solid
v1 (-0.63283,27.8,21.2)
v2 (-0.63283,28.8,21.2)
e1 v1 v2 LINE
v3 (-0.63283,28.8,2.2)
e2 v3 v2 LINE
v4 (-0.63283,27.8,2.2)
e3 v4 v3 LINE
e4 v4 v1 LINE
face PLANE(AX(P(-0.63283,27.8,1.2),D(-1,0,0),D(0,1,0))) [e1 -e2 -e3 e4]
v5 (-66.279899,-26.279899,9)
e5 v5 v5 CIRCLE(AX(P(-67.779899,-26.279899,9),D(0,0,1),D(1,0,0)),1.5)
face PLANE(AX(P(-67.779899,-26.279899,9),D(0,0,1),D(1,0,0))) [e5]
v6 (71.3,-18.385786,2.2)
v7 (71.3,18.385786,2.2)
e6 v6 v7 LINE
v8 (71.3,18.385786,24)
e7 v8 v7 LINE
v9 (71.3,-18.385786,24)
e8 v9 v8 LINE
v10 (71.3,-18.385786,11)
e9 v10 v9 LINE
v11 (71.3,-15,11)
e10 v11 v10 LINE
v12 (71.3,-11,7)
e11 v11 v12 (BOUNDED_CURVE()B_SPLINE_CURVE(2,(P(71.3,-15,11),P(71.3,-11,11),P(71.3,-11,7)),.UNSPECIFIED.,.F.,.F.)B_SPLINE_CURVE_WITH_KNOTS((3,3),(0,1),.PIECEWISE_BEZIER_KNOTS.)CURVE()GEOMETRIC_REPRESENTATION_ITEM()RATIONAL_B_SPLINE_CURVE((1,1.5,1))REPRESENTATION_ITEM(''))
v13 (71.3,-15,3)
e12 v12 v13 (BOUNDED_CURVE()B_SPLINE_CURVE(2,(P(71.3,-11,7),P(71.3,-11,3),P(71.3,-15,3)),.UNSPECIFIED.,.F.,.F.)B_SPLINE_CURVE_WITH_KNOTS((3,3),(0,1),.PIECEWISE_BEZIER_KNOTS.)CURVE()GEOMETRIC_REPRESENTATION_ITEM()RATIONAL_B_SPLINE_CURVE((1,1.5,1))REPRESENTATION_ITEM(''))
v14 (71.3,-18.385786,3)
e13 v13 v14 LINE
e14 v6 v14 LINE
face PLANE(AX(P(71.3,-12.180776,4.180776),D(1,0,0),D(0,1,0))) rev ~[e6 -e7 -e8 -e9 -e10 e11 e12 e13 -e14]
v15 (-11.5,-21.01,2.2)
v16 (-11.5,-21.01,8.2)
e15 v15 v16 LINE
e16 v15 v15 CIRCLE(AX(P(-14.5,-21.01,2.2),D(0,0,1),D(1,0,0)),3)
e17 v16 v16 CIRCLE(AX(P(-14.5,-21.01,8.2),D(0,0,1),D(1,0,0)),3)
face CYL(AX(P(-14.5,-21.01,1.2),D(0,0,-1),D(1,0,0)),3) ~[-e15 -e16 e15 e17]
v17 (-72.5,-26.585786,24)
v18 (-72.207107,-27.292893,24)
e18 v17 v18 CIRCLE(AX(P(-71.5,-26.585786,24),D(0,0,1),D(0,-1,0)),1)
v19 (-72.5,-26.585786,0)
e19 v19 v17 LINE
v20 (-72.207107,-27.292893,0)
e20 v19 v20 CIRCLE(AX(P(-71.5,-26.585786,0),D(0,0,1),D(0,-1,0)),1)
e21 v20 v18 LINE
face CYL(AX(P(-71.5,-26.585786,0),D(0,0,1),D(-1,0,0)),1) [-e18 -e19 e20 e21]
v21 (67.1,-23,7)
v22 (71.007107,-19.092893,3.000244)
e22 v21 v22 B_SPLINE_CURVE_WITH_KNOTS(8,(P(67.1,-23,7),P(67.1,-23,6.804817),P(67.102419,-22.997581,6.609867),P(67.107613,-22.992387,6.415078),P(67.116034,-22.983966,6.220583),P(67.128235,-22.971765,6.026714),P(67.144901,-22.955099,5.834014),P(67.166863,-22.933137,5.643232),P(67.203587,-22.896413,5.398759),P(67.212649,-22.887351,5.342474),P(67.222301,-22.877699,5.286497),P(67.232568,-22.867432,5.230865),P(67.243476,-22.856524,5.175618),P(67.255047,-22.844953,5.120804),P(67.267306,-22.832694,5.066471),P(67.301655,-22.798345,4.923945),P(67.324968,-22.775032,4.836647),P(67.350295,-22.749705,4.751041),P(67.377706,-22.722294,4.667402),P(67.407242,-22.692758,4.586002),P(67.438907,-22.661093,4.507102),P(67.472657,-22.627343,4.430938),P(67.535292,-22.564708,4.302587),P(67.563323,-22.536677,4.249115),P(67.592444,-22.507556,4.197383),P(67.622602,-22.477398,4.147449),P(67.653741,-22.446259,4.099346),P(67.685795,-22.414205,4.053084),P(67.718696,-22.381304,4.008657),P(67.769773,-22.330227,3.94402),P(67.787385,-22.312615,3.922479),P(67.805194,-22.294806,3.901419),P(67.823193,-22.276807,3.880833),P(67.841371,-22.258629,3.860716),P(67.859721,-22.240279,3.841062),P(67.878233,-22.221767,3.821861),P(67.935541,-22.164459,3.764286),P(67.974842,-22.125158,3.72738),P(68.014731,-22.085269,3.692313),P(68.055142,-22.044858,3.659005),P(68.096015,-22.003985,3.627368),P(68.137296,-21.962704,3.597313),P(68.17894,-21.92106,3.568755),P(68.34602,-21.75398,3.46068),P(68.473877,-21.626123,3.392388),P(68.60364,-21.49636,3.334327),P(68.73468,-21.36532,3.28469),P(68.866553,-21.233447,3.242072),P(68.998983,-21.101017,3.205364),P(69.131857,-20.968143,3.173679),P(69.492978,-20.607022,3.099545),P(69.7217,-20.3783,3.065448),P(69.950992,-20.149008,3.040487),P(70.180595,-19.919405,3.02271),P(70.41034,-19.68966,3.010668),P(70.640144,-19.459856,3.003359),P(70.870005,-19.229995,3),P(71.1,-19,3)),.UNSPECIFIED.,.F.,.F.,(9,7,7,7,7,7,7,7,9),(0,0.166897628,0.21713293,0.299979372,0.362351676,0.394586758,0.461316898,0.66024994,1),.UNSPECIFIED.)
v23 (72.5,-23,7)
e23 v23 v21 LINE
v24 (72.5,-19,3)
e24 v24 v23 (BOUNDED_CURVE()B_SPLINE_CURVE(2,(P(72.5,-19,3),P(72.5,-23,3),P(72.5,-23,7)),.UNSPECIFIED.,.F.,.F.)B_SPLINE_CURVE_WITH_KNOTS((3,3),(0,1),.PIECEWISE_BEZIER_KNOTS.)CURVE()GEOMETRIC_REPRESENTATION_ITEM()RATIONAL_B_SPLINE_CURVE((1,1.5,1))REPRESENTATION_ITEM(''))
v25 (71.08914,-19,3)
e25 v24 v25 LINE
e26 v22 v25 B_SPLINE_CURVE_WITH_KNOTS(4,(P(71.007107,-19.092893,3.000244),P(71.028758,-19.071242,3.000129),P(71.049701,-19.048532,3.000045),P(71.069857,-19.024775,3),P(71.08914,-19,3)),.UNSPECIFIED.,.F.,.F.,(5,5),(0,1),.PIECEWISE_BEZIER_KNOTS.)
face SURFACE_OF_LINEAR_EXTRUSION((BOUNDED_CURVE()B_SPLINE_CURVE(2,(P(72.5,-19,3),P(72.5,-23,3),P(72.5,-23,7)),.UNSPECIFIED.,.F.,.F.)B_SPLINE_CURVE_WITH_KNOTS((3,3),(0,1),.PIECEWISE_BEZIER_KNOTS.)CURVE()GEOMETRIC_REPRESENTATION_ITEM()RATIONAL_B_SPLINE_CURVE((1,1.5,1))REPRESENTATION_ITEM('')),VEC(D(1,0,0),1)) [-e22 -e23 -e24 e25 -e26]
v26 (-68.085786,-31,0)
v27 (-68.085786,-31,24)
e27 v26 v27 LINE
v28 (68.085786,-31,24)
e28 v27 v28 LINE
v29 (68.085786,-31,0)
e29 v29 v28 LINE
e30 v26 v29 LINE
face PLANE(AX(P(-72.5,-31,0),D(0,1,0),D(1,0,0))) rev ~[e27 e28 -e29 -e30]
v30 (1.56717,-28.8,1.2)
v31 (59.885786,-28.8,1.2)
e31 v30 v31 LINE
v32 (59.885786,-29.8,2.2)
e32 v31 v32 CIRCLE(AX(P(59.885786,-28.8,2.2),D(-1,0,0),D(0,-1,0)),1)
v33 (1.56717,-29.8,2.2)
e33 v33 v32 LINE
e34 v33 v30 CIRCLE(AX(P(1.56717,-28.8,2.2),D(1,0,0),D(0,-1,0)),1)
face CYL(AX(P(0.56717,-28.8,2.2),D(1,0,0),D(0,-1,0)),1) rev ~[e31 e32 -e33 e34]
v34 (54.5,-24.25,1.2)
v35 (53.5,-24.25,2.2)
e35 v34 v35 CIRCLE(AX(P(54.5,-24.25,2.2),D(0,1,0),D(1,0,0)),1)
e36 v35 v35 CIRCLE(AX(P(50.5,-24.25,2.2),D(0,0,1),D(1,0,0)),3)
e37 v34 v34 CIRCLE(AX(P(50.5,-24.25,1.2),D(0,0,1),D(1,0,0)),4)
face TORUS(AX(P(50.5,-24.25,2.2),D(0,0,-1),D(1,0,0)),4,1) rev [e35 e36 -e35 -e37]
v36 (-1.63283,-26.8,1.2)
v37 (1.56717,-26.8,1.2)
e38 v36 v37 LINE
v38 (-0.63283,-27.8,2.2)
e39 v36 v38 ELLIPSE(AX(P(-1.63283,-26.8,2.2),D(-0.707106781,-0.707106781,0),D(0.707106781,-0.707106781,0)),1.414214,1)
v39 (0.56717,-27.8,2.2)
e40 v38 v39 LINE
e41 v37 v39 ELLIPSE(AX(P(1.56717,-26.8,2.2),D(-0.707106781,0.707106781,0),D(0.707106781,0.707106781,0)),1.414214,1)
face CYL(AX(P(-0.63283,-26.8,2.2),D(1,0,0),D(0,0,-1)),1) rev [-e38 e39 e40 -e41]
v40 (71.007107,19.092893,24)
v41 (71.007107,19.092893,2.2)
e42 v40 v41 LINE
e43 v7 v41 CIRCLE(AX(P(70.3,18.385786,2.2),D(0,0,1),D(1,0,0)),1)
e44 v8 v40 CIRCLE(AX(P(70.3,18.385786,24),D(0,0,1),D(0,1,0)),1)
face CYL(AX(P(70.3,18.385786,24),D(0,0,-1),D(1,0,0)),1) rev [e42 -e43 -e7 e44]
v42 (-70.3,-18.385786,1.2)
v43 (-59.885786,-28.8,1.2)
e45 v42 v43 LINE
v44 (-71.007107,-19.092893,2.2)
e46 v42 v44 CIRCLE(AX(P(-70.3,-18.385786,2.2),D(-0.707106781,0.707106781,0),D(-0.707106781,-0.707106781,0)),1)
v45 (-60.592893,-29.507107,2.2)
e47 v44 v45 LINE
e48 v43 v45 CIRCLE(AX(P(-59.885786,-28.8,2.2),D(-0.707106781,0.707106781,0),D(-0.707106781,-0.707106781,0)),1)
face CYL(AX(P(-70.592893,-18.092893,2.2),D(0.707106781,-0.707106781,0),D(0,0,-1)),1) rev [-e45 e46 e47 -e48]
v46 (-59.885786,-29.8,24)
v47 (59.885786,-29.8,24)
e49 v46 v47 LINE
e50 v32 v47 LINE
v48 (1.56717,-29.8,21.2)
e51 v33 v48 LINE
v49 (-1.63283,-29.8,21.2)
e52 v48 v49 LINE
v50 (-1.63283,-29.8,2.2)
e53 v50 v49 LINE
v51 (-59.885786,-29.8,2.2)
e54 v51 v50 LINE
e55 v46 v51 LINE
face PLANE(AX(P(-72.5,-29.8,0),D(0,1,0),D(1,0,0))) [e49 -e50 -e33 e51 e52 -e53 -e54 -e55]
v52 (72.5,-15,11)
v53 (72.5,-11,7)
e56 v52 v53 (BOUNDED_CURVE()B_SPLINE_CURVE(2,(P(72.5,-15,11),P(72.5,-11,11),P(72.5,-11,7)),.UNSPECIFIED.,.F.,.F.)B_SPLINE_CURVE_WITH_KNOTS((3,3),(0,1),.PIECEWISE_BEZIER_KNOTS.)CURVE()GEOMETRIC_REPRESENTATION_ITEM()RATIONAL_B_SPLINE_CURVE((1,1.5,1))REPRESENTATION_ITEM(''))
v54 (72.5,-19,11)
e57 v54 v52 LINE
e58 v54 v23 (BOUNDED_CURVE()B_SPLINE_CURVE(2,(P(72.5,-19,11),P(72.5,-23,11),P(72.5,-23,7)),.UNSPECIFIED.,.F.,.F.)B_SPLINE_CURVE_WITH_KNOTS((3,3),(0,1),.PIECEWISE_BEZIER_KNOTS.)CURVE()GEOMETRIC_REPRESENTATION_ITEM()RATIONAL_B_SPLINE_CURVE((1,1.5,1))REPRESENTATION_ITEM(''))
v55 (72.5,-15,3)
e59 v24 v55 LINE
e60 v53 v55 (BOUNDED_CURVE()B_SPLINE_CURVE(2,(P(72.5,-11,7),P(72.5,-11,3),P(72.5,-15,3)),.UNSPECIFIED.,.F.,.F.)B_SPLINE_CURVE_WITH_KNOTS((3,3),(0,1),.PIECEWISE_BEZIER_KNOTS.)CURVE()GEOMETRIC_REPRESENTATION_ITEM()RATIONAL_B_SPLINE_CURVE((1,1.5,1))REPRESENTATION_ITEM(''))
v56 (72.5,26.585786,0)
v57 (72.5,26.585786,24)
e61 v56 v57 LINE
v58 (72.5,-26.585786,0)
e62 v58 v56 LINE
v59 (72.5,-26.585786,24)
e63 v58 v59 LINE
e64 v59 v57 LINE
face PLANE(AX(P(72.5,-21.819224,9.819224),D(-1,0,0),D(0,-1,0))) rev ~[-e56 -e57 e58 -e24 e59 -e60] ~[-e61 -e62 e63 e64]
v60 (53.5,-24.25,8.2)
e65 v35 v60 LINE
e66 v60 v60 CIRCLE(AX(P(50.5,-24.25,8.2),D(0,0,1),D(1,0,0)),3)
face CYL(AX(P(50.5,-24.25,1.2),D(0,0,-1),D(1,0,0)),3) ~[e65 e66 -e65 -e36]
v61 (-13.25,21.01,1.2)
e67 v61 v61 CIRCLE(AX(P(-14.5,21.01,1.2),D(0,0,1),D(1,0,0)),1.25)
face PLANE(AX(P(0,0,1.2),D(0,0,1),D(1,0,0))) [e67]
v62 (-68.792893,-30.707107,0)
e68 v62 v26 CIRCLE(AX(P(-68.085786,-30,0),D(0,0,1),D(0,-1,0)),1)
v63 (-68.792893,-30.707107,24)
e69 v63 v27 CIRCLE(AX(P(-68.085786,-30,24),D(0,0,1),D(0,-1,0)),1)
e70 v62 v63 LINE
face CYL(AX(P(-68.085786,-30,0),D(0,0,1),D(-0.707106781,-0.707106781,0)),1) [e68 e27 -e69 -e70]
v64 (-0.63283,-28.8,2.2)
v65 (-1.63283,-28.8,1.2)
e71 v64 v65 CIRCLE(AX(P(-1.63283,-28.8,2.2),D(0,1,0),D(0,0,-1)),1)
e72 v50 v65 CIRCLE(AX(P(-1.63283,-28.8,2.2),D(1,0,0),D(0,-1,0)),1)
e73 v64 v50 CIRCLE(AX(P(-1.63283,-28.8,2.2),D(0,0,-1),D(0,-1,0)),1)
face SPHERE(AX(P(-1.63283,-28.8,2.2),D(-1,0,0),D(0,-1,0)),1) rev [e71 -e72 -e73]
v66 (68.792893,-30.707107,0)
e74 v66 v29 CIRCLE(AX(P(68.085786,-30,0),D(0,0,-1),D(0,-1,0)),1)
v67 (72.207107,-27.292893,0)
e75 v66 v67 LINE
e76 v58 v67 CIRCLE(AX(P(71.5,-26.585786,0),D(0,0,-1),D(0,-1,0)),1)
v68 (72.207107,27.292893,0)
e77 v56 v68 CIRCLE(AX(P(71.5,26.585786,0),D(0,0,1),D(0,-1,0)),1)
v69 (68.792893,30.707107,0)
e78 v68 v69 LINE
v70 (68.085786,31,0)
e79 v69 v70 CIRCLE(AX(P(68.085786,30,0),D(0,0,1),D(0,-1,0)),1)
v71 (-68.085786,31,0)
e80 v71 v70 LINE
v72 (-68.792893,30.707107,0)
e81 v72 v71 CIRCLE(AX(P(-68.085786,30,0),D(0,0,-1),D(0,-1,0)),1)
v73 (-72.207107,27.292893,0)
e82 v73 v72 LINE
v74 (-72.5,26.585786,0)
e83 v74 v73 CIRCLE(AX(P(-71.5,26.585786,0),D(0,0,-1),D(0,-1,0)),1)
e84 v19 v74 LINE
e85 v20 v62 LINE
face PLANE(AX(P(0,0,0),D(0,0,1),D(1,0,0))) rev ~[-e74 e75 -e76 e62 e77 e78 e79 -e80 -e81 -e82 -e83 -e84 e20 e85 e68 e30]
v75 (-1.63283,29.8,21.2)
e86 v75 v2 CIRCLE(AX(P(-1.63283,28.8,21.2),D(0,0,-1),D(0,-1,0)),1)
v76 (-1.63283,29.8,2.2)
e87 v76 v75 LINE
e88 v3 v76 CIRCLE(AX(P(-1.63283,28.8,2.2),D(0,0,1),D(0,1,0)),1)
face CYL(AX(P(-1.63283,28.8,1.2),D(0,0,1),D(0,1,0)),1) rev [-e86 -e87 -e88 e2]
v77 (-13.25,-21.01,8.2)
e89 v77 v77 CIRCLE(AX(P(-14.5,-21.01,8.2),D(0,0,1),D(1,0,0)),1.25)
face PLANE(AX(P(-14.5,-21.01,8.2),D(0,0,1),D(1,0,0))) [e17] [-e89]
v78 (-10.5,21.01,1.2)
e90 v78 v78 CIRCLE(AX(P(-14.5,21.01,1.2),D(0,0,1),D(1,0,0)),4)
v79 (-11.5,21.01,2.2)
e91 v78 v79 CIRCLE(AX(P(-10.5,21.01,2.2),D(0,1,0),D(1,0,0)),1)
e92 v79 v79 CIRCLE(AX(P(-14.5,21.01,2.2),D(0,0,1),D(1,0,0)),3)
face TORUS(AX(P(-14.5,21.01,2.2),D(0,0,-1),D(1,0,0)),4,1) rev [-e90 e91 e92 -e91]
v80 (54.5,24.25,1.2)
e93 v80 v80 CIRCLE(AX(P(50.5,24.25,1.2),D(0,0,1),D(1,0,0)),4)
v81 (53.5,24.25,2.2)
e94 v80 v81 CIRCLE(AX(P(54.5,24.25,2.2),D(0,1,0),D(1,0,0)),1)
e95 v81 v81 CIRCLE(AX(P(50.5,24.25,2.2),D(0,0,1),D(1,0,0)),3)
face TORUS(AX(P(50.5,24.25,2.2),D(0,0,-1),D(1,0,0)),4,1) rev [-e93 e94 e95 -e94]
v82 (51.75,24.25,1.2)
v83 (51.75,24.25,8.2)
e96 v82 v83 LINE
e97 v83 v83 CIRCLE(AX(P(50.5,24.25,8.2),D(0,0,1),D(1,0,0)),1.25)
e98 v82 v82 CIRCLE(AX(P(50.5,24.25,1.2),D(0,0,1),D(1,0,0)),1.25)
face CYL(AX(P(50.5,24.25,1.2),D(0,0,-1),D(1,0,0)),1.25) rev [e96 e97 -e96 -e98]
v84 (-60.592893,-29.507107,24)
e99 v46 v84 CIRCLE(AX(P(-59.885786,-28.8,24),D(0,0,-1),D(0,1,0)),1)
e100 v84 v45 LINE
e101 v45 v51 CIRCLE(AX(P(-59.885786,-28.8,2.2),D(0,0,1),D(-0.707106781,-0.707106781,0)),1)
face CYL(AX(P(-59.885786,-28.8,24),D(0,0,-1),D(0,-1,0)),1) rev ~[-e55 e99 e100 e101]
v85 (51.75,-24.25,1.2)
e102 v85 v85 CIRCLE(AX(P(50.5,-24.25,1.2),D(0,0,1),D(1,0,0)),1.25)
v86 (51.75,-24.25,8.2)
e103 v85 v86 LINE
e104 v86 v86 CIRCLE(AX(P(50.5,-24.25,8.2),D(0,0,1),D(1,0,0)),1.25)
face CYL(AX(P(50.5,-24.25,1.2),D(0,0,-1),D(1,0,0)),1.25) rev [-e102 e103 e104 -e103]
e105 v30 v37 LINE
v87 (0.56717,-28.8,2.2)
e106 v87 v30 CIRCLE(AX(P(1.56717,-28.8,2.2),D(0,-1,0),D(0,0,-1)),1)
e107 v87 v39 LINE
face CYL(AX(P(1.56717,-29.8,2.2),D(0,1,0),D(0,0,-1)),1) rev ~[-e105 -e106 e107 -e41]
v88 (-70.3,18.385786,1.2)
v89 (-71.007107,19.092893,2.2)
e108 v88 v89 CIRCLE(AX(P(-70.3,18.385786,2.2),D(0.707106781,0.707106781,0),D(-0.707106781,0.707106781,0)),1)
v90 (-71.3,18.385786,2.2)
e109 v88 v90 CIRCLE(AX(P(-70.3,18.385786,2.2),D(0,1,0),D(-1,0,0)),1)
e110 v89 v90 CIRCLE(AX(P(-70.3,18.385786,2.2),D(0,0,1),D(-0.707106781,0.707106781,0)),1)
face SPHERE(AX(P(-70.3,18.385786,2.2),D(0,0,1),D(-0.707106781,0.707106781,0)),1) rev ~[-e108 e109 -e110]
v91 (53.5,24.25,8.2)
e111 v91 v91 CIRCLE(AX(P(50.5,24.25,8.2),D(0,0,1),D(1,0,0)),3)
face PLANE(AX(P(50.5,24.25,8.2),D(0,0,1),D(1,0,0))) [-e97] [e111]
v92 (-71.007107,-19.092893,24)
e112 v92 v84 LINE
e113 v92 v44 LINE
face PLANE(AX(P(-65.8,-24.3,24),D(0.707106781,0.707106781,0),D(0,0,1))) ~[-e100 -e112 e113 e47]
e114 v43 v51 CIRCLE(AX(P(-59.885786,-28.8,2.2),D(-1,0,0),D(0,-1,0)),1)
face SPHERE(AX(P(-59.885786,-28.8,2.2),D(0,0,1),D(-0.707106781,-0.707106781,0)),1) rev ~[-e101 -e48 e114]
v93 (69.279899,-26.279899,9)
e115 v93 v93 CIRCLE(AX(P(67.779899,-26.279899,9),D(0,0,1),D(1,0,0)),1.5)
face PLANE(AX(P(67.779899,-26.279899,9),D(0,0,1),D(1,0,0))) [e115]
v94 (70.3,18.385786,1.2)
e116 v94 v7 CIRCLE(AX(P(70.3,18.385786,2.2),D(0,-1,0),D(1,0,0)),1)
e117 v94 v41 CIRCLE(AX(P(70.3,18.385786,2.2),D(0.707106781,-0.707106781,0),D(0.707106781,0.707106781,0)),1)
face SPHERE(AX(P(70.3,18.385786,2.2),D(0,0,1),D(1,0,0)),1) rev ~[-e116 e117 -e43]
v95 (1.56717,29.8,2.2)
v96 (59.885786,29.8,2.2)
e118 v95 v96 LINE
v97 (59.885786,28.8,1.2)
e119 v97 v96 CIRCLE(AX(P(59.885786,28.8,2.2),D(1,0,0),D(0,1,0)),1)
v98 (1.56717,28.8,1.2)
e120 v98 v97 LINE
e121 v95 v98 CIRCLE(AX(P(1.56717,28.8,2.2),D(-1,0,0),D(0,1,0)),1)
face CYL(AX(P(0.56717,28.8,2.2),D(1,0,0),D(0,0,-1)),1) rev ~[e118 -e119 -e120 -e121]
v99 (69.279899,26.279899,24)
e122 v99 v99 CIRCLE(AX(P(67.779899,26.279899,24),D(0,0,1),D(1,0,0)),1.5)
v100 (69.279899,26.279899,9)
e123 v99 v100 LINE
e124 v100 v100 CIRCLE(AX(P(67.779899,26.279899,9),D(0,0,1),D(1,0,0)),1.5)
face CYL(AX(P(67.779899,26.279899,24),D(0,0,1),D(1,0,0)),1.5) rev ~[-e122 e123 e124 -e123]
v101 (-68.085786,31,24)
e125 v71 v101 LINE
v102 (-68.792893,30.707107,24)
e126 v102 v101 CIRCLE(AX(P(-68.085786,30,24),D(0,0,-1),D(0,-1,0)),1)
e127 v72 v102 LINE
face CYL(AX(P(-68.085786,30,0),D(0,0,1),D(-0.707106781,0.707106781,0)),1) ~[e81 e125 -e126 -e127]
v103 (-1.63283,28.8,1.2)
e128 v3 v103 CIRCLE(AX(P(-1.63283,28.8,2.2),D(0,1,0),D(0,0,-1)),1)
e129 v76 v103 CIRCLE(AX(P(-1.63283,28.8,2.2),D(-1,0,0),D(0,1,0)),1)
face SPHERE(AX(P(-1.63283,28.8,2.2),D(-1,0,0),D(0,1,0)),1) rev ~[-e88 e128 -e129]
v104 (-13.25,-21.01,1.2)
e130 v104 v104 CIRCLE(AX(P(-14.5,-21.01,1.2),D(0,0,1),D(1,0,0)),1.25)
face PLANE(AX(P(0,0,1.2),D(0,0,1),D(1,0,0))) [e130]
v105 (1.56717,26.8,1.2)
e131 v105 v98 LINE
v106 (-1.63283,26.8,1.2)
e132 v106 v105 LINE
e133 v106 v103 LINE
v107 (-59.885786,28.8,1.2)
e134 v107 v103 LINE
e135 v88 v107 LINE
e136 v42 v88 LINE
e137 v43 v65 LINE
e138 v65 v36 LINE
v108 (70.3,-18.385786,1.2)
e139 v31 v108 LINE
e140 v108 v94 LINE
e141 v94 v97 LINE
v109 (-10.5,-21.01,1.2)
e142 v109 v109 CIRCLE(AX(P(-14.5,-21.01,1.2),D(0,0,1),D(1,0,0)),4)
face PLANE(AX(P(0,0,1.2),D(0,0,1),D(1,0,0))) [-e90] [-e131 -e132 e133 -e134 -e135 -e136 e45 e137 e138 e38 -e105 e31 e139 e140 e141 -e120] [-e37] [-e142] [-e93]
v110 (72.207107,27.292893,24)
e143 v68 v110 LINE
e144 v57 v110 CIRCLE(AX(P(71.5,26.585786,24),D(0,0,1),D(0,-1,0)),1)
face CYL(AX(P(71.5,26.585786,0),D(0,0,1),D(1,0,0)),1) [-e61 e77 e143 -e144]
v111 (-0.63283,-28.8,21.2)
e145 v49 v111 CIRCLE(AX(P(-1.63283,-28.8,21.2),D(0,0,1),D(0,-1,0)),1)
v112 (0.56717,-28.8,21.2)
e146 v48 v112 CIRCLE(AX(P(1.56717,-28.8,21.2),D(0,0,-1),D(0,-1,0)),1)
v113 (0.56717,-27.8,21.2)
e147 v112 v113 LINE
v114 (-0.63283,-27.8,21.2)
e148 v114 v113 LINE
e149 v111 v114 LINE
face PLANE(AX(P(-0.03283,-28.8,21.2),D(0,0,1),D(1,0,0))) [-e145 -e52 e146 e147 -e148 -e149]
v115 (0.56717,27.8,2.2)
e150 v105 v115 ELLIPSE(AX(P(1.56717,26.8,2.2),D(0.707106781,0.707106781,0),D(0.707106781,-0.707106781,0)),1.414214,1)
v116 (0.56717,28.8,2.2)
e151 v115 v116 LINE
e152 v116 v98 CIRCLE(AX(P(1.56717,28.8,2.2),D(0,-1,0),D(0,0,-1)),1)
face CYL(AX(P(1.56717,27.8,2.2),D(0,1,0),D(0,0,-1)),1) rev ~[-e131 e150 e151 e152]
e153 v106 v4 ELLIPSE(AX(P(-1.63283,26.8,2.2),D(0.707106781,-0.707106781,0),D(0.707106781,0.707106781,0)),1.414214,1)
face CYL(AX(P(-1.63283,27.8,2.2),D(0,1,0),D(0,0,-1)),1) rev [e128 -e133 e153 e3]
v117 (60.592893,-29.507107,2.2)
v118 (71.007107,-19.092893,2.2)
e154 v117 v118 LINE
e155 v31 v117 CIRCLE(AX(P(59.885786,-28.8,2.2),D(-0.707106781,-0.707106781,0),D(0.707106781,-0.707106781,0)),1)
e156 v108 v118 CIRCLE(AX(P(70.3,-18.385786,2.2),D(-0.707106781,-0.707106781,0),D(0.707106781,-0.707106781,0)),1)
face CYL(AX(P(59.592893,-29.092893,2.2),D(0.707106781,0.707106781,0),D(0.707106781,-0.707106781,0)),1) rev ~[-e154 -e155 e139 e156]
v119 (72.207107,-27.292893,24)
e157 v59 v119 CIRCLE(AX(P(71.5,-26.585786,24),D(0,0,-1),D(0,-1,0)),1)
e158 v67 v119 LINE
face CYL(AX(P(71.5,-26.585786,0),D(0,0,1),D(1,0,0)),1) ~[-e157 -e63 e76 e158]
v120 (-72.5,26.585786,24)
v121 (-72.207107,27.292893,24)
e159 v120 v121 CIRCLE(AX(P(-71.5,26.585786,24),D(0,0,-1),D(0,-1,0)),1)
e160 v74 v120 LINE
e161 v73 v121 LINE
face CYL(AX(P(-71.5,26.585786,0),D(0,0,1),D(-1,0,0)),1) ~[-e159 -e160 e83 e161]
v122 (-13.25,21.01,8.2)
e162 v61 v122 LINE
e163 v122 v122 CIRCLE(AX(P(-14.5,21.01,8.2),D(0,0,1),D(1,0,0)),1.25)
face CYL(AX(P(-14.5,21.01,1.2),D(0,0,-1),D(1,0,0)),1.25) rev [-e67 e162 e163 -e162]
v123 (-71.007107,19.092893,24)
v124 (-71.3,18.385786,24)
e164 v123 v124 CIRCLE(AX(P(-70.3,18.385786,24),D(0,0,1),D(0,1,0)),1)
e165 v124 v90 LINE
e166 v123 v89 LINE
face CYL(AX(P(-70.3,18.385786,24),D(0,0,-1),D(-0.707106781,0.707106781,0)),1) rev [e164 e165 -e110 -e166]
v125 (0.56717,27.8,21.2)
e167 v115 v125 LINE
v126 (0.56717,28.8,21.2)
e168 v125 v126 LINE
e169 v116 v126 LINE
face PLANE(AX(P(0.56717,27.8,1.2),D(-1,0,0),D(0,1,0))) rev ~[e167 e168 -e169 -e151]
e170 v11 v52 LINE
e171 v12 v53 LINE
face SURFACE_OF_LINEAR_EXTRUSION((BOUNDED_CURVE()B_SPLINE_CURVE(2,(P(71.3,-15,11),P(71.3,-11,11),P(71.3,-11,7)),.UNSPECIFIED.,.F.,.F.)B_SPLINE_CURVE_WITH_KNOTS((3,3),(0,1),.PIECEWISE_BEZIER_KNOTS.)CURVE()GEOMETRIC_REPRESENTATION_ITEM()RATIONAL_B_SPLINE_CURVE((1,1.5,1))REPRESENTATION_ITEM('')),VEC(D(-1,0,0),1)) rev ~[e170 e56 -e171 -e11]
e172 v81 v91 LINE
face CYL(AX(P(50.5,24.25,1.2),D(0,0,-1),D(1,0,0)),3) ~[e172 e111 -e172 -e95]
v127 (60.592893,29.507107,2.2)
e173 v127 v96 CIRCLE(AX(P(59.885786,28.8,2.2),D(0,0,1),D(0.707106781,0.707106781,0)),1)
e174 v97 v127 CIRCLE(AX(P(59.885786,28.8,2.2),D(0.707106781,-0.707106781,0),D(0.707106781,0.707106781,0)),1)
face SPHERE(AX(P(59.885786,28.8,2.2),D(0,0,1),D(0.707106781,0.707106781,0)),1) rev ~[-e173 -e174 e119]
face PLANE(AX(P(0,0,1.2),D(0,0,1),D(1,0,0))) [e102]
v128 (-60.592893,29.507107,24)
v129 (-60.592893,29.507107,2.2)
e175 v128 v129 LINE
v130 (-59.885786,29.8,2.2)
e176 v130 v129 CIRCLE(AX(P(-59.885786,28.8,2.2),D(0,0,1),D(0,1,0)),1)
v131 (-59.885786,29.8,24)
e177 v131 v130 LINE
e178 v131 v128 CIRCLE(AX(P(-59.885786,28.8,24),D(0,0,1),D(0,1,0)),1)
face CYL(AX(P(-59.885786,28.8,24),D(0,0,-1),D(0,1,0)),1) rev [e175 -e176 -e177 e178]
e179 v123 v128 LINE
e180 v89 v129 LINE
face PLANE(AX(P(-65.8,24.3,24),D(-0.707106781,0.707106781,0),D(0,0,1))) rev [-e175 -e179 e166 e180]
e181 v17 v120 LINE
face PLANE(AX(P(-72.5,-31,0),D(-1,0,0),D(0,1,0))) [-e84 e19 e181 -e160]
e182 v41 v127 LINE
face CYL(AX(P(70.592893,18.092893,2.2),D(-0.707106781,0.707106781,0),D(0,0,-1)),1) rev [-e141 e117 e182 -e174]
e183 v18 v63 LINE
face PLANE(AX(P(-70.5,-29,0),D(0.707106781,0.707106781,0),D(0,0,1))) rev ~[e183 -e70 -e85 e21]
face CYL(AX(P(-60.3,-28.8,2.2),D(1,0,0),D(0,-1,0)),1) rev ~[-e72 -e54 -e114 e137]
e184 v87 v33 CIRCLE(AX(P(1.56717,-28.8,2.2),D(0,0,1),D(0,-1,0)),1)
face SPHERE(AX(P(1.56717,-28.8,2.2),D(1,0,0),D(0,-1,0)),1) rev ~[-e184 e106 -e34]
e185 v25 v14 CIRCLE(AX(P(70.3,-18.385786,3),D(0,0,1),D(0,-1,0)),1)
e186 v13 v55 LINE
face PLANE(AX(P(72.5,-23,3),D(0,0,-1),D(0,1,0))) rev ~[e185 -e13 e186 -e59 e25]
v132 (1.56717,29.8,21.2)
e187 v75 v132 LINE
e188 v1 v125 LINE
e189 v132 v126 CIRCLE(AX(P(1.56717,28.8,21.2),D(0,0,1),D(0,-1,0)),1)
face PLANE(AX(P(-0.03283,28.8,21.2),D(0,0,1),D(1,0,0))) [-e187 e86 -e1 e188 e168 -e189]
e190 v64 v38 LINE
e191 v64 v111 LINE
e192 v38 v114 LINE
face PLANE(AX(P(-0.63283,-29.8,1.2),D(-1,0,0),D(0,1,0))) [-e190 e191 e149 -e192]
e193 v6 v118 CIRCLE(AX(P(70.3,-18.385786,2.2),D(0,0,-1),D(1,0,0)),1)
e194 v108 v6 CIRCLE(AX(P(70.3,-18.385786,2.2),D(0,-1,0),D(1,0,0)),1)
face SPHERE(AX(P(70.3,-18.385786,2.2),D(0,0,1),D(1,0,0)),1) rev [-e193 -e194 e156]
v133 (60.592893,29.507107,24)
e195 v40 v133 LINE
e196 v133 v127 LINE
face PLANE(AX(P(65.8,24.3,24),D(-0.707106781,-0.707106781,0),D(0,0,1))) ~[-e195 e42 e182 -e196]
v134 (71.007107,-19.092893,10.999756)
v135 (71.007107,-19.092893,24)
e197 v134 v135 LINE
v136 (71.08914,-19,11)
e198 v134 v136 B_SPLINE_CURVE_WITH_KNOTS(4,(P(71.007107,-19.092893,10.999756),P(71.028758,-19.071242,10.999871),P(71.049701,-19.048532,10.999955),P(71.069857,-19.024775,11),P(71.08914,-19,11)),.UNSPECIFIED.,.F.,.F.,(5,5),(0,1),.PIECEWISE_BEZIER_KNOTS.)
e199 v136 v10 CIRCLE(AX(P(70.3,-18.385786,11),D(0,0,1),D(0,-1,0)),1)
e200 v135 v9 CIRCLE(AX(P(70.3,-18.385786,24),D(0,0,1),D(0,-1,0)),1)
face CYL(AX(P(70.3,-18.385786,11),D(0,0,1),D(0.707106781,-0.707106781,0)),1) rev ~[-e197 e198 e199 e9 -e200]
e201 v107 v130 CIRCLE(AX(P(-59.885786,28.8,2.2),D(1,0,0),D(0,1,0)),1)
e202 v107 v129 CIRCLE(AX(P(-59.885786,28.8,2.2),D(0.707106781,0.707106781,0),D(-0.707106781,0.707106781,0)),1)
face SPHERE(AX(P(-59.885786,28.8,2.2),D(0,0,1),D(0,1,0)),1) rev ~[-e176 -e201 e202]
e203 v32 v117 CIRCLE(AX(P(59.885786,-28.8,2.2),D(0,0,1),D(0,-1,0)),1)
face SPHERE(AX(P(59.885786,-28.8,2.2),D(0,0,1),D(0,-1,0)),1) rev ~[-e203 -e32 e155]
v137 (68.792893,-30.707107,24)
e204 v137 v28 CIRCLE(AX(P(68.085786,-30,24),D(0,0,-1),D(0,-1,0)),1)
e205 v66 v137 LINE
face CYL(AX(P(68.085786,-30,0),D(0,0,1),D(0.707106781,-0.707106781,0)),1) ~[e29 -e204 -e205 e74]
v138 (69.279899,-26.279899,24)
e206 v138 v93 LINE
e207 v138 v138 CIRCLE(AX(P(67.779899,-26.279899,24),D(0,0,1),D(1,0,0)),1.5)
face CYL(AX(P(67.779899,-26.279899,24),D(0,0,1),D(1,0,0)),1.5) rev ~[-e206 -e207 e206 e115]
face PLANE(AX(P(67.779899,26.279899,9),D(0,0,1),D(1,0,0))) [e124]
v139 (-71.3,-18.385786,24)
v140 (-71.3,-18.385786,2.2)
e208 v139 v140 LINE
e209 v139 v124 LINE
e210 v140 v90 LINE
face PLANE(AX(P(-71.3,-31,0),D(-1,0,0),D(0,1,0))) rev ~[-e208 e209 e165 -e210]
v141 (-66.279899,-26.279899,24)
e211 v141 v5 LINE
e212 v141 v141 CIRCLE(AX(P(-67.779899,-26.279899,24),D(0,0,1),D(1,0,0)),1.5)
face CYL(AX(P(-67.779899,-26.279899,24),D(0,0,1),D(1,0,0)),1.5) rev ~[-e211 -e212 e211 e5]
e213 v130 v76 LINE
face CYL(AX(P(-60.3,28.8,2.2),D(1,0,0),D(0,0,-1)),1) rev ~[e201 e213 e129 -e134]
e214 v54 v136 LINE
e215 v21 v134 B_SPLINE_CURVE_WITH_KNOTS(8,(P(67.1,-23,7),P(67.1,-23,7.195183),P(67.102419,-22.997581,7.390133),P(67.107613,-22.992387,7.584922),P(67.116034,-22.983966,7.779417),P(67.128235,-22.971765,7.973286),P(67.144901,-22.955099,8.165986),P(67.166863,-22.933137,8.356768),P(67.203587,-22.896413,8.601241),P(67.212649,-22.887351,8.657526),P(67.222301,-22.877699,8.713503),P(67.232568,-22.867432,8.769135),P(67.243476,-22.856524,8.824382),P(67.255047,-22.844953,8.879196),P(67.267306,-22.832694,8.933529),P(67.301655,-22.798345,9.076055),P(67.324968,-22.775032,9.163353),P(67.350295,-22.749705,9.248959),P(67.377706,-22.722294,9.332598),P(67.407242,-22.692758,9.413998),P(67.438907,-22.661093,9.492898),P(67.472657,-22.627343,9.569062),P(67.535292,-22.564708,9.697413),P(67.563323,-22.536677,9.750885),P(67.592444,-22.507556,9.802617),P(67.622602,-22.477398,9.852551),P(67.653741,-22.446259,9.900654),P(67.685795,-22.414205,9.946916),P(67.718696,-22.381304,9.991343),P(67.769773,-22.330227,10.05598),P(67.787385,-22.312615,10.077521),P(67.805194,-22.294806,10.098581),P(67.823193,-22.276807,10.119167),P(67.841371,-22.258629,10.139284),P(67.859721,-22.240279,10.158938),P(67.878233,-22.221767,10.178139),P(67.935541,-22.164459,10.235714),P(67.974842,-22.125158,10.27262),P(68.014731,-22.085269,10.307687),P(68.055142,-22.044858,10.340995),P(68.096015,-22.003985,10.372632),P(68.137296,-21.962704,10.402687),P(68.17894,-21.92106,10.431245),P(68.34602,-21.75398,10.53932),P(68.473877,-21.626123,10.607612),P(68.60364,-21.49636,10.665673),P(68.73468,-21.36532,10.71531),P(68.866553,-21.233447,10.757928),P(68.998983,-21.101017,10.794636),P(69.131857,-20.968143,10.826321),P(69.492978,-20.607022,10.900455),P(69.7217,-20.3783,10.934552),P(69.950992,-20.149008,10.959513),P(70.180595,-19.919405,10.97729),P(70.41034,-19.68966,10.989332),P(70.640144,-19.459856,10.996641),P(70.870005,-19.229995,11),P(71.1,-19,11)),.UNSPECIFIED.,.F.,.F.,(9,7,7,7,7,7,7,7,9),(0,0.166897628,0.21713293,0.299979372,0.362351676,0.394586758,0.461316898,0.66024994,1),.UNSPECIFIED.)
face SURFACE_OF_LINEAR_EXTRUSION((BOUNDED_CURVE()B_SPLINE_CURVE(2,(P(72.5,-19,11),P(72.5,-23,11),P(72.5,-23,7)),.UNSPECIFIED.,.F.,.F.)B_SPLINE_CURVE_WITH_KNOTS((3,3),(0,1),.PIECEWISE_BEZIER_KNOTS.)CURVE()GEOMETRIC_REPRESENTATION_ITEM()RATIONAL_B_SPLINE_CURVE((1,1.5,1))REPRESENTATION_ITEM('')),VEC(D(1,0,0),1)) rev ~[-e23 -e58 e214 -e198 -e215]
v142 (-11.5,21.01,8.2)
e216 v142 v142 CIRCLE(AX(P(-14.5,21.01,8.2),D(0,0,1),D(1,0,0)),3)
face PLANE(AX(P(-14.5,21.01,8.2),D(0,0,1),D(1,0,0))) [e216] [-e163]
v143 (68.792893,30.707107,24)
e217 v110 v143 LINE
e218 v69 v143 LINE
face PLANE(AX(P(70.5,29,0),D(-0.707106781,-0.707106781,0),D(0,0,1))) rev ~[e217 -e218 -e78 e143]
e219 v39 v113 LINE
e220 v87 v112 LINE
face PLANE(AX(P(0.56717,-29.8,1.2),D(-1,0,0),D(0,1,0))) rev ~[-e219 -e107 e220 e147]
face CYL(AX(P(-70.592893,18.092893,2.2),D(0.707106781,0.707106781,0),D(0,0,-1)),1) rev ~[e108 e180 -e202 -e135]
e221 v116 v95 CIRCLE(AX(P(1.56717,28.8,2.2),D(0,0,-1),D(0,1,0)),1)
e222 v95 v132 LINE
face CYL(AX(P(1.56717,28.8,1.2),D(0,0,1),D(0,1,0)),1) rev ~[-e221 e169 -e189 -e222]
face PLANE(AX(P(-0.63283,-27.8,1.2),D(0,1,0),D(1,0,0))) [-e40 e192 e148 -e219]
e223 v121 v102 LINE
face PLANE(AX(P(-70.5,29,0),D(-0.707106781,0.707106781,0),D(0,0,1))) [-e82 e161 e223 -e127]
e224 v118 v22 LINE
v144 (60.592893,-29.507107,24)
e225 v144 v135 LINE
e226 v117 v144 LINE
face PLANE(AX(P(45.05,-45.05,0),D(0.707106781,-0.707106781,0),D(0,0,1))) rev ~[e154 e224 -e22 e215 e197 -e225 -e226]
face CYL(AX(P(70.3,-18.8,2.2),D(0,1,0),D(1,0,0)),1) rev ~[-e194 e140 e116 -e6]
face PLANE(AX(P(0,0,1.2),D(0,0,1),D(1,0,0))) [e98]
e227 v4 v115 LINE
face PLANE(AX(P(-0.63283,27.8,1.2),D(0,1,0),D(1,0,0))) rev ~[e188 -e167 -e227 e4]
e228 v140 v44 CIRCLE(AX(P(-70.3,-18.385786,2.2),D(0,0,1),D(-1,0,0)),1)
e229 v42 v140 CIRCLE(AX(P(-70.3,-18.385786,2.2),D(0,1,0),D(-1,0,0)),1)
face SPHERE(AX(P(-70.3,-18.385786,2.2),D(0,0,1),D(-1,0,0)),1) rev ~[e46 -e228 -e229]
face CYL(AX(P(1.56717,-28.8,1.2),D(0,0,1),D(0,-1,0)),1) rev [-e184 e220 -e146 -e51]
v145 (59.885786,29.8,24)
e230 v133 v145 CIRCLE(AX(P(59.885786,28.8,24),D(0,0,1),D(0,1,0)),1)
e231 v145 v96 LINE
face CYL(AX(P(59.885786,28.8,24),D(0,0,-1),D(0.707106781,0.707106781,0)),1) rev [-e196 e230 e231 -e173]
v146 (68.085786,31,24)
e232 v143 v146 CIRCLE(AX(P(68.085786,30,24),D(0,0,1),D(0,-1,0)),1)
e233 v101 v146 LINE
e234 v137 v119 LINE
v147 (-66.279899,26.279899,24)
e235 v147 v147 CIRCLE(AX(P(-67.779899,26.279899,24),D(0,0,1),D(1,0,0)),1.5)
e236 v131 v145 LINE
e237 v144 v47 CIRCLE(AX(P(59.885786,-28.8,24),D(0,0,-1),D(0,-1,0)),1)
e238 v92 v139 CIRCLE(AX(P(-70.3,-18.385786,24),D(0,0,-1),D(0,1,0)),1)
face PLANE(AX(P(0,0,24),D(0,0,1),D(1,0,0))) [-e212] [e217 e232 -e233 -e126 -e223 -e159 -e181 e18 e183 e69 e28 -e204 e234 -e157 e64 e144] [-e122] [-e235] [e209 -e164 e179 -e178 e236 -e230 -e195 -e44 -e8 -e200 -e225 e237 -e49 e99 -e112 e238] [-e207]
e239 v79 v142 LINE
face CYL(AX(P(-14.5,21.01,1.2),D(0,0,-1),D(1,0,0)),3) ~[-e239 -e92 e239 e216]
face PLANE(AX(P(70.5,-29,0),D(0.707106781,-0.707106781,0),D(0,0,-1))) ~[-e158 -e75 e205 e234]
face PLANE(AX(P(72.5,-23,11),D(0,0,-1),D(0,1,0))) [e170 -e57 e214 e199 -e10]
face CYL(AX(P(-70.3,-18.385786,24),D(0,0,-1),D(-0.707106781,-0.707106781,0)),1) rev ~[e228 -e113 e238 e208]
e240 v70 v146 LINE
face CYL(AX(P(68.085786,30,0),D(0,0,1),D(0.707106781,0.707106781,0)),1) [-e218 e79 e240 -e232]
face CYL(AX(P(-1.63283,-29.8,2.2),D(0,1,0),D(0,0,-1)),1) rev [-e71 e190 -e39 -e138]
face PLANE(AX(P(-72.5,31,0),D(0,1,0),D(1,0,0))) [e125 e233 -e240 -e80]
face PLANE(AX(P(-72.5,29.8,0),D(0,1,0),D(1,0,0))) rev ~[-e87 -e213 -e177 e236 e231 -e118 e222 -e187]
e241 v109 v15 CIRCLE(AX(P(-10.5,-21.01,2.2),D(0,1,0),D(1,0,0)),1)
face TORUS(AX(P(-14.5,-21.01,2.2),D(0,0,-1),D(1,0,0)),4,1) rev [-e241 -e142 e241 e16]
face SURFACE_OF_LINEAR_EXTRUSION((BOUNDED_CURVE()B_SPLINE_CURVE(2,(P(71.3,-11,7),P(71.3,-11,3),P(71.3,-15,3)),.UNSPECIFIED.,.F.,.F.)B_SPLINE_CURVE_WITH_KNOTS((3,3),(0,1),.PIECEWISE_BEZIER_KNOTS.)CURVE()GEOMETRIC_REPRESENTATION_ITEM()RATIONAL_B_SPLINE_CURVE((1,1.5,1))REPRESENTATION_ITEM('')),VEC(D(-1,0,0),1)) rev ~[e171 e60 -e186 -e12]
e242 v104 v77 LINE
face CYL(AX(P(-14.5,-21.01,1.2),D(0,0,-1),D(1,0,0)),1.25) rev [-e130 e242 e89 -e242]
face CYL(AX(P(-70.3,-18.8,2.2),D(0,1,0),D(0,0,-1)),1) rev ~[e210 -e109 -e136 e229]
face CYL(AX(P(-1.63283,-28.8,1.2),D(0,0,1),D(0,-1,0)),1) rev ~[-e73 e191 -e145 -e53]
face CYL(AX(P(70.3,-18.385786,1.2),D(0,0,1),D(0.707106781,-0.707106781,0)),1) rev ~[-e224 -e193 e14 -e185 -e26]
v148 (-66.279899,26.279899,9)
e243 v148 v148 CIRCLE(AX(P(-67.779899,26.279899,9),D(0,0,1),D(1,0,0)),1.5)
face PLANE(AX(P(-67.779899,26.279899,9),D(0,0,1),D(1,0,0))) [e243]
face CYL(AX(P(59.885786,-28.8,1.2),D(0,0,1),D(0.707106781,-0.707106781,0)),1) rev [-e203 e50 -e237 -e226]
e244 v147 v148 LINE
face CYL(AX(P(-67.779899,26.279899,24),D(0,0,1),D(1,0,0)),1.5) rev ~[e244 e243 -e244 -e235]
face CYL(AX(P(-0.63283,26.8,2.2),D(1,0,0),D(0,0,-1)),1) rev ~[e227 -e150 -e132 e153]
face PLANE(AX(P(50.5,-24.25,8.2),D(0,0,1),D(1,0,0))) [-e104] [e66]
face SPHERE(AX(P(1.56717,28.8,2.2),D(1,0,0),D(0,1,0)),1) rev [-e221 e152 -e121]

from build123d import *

# Parameters (mm, degrees)
F0_W          = 145
F0_H          = 62
F1_DEPTH      = 24
F2_T          = -1.2
F3_SIZE       = 11
F4_SIZE       = 4
F5_R          = 1.5
F6_DEPTH      = 15
F7_R          = 3
F7_R_2        = 1.25
F8_DEPTH      = 7
F7_W          = 1.2
F7_H          = 2
F9_DEPTH      = 20
F10_W         = 12
F10_H         = 8
F11_DEPTH     = 5.401
F12_T1_DEPTH  = 1.2
F12_T6_DEPTH  = 15.4
F12_T11_DEPTH = 15.4
F13_R         = 1


# Not quite as in the source:
# - a fillet or chamfer that OpenCascade refuses, or shapes differently, is made with other operations: its cross-section is extruded or revolved along the edge and cut away or added
# - a feature names something its author has since deleted; it is built from what else it names


with BuildPart() as f1:
    # F0 (on Top) → F1 (new body)
    with BuildSketch(Plane.XY):
        Rectangle(F0_W, F0_H)
    extrude(amount=F1_DEPTH)

    # F2
    f2_openings = [f1.faces().sort_by_distance(p)[0] for p in [
        (0, 0, 24),
    ]]
    offset(amount=F2_T, openings=f2_openings)

    # F3
    f3_edges = [f1.edges().sort_by_distance(p)[0] for p in [
        (71.3, 29.8, 12.6),
        (-71.3, 29.8, 12.6),
        (-71.3, -29.8, 12.6),
        (71.3, -29.8, 12.6),
    ]]
    chamfer(f3_edges, length=F3_SIZE)

    # F4
    f4_edges = [f1.edges().sort_by_distance(p)[0] for p in [
        (-72.5, -31, 12),
        (-72.5, 31, 12),
        (72.5, -31, 12),
        (72.5, 31, 12),
    ]]
    chamfer(f4_edges, length=F4_SIZE)

    # F5 (on face) → F6 (cut)
    with BuildSketch(Plane.XY.offset(24)):
        with Locations((-67.7798989873, 26.2798989873)):
            Circle(F5_R)
        with Locations((-67.7798989873, -26.2798989873)):
            Circle(F5_R)
        with Locations((67.7798989873, -26.2798989873)):
            Circle(F5_R)
        with Locations((67.7798989873, 26.2798989873)):
            Circle(F5_R)
    extrude(amount=-F6_DEPTH, mode=Mode.SUBTRACT)

    # F7 (on face) → F8 (join)
    with BuildSketch(Plane.XY.offset(1.2)):
        with Locations((-14.5, -21.01)):
            Circle(F7_R)
        with Locations((-14.5, -21.01)):
            Circle(F7_R_2, mode=Mode.SUBTRACT)
        with Locations((50.5, -24.25)):
            Circle(F7_R)
        with Locations((50.5, -24.25)):
            Circle(F7_R_2, mode=Mode.SUBTRACT)
        with Locations((50.5, 24.25)):
            Circle(F7_R)
        with Locations((50.5, 24.25)):
            Circle(F7_R_2, mode=Mode.SUBTRACT)
        with Locations((-14.5, 21.01)):
            Circle(F7_R)
        with Locations((-14.5, 21.01)):
            Circle(F7_R_2, mode=Mode.SUBTRACT)
    extrude(amount=F8_DEPTH)

    # F7 (on face) → F9 (join)
    with BuildSketch(Plane.XY.offset(1.2)):
        with Locations((-0.03283014, 28.8)):
            Rectangle(F7_W, F7_H)
        with Locations((-0.03283014, -28.8)):
            Rectangle(F7_W, F7_H)
    extrude(amount=F9_DEPTH)

    # F10 (on face) → F11 (cut, through all)
    with BuildSketch(Plane.YZ.offset(72.5)):
        with Locations((-17, 7)):
            Rectangle(F10_W, F10_H)
    extrude(amount=-F11_DEPTH, mode=Mode.SUBTRACT)

    # F12: fillet of radius 4 on 4 edges, made by hand

    # F12_s2 → F12_t1 (join)
    with BuildSketch(Plane.YZ.offset(71.3)):
        with BuildLine():
            add(Edge.make_bspline(
                [(-11, 7), (-11, 3), (-15, 3)],
                knots=[0, 0, 0, 1, 1, 1], degree=2, weights=[1, 1.5, 1]))
            Line((-15, 3), (-11, 3))
            Line((-11, 3), (-11, 7))
        make_face()
        with BuildLine():
            add(Edge.make_bspline(
                [(-15, 11), (-11, 11), (-11, 7)],
                knots=[0, 0, 0, 1, 1, 1], degree=2, weights=[1, 1.5, 1]))
            Line((-11, 7), (-11, 11))
            Line((-11, 11), (-15, 11))
        make_face()
    extrude(amount=F12_T1_DEPTH)


with BuildPart() as f12_tool4:
    # F12_s5 → F12_t6 (new body)
    with BuildSketch(Plane.YZ.offset(72.5)):
        with BuildLine():
            add(Edge.make_bspline(
                [(-19, 3), (-23, 3), (-23, 7)],
                knots=[0, 0, 0, 1, 1, 1], degree=2, weights=[1, 1.5, 1]))
            Line((-23, 7), (-23, 3))
            Line((-23, 3), (-19, 3))
        make_face()
    extrude(amount=-F12_T6_DEPTH)

    split(bisect_by=Plane(origin=(45.05, -45.05, 0), x_dir=(0, 0, 1), z_dir=(0.7071067812, -0.7071067812, 0)), keep=Keep.TOP)


with BuildPart() as f1_1:
    add(f1.part)

    # F12_t3: union F12_tool4
    add(f12_tool4.part)


with BuildPart() as f12_tool9:
    # F12_s10 → F12_t11 (new body)
    with BuildSketch(Plane.YZ.offset(72.5)):
        with BuildLine():
            add(Edge.make_bspline(
                [(-19, 11), (-23, 11), (-23, 7)],
                knots=[0, 0, 0, 1, 1, 1], degree=2, weights=[1, 1.5, 1]))
            Line((-23, 7), (-23, 11))
            Line((-23, 11), (-19, 11))
        make_face()
    extrude(amount=-F12_T11_DEPTH)

    split(bisect_by=Plane(origin=(45.05, -45.05, 0), x_dir=(0, 0, 1), z_dir=(0.7071067812, -0.7071067812, 0)), keep=Keep.TOP)


with BuildPart() as f1_2:
    add(f1_1.part)

    # F12_t8: union F12_tool9
    add(f12_tool9.part)

    # F13
    f13_edges = [f1_2.edges().sort_by_distance(p)[0] for p in [
        (-60.3, 29.8, 12.6),
        (-71.3, 18.8, 12.6),
        (60.3, 29.8, 12.6),
        (71.3, 18.8, 12.6),
        (60.3, -29.8, 12.6),
        (-60.3, -29.8, 12.6),
        (-71.3, -18.8, 12.6),
        (-72.5, -27, 12),
        (-68.5, -31, 12),
        (68.5, -31, 12),
        (72.5, -27, 12),
        (72.5, 27, 12),
        (68.5, 31, 12),
        (-68.5, 31, 12),
        (-72.5, 27, 12),
        (71.3, -18.8, 2.1),
        (71.3, -18.8, 17.5),
        (71.3, 0, 1.2),
        (65.8, 24.3, 1.2),
        (30.433585, 29.8, 1.2),
        (-30.466415, 29.8, 1.2),
        (-65.8, 24.3, 1.2),
        (-71.3, 0, 1.2),
        (-17.5, 21.01, 1.2),
        (47.5, 24.25, 1.2),
        (-17.5, -21.01, 1.2),
        (-65.8, -24.3, 1.2),
        (-30.466415, -29.8, 1.2),
        (30.433585, -29.8, 1.2),
        (47.5, -24.25, 1.2),
        (65.8, -24.3, 1.2),
        (-0.63283, -29.8, 11.2),
        (0.56717, -29.8, 11.2),
        (0.56717, 29.8, 11.2),
        (-0.63283, 29.8, 11.2),
        (-0.63283, 28.8, 1.2),
        (-0.03283, 27.8, 1.2),
        (0.56717, 28.8, 1.2),
        (-0.03283, -27.8, 1.2),
        (-0.63283, -28.8, 1.2),
        (0.56717, -28.8, 1.2),
    ]]
    fillet(f13_edges, radius=F13_R)


solid = f1_2.part
